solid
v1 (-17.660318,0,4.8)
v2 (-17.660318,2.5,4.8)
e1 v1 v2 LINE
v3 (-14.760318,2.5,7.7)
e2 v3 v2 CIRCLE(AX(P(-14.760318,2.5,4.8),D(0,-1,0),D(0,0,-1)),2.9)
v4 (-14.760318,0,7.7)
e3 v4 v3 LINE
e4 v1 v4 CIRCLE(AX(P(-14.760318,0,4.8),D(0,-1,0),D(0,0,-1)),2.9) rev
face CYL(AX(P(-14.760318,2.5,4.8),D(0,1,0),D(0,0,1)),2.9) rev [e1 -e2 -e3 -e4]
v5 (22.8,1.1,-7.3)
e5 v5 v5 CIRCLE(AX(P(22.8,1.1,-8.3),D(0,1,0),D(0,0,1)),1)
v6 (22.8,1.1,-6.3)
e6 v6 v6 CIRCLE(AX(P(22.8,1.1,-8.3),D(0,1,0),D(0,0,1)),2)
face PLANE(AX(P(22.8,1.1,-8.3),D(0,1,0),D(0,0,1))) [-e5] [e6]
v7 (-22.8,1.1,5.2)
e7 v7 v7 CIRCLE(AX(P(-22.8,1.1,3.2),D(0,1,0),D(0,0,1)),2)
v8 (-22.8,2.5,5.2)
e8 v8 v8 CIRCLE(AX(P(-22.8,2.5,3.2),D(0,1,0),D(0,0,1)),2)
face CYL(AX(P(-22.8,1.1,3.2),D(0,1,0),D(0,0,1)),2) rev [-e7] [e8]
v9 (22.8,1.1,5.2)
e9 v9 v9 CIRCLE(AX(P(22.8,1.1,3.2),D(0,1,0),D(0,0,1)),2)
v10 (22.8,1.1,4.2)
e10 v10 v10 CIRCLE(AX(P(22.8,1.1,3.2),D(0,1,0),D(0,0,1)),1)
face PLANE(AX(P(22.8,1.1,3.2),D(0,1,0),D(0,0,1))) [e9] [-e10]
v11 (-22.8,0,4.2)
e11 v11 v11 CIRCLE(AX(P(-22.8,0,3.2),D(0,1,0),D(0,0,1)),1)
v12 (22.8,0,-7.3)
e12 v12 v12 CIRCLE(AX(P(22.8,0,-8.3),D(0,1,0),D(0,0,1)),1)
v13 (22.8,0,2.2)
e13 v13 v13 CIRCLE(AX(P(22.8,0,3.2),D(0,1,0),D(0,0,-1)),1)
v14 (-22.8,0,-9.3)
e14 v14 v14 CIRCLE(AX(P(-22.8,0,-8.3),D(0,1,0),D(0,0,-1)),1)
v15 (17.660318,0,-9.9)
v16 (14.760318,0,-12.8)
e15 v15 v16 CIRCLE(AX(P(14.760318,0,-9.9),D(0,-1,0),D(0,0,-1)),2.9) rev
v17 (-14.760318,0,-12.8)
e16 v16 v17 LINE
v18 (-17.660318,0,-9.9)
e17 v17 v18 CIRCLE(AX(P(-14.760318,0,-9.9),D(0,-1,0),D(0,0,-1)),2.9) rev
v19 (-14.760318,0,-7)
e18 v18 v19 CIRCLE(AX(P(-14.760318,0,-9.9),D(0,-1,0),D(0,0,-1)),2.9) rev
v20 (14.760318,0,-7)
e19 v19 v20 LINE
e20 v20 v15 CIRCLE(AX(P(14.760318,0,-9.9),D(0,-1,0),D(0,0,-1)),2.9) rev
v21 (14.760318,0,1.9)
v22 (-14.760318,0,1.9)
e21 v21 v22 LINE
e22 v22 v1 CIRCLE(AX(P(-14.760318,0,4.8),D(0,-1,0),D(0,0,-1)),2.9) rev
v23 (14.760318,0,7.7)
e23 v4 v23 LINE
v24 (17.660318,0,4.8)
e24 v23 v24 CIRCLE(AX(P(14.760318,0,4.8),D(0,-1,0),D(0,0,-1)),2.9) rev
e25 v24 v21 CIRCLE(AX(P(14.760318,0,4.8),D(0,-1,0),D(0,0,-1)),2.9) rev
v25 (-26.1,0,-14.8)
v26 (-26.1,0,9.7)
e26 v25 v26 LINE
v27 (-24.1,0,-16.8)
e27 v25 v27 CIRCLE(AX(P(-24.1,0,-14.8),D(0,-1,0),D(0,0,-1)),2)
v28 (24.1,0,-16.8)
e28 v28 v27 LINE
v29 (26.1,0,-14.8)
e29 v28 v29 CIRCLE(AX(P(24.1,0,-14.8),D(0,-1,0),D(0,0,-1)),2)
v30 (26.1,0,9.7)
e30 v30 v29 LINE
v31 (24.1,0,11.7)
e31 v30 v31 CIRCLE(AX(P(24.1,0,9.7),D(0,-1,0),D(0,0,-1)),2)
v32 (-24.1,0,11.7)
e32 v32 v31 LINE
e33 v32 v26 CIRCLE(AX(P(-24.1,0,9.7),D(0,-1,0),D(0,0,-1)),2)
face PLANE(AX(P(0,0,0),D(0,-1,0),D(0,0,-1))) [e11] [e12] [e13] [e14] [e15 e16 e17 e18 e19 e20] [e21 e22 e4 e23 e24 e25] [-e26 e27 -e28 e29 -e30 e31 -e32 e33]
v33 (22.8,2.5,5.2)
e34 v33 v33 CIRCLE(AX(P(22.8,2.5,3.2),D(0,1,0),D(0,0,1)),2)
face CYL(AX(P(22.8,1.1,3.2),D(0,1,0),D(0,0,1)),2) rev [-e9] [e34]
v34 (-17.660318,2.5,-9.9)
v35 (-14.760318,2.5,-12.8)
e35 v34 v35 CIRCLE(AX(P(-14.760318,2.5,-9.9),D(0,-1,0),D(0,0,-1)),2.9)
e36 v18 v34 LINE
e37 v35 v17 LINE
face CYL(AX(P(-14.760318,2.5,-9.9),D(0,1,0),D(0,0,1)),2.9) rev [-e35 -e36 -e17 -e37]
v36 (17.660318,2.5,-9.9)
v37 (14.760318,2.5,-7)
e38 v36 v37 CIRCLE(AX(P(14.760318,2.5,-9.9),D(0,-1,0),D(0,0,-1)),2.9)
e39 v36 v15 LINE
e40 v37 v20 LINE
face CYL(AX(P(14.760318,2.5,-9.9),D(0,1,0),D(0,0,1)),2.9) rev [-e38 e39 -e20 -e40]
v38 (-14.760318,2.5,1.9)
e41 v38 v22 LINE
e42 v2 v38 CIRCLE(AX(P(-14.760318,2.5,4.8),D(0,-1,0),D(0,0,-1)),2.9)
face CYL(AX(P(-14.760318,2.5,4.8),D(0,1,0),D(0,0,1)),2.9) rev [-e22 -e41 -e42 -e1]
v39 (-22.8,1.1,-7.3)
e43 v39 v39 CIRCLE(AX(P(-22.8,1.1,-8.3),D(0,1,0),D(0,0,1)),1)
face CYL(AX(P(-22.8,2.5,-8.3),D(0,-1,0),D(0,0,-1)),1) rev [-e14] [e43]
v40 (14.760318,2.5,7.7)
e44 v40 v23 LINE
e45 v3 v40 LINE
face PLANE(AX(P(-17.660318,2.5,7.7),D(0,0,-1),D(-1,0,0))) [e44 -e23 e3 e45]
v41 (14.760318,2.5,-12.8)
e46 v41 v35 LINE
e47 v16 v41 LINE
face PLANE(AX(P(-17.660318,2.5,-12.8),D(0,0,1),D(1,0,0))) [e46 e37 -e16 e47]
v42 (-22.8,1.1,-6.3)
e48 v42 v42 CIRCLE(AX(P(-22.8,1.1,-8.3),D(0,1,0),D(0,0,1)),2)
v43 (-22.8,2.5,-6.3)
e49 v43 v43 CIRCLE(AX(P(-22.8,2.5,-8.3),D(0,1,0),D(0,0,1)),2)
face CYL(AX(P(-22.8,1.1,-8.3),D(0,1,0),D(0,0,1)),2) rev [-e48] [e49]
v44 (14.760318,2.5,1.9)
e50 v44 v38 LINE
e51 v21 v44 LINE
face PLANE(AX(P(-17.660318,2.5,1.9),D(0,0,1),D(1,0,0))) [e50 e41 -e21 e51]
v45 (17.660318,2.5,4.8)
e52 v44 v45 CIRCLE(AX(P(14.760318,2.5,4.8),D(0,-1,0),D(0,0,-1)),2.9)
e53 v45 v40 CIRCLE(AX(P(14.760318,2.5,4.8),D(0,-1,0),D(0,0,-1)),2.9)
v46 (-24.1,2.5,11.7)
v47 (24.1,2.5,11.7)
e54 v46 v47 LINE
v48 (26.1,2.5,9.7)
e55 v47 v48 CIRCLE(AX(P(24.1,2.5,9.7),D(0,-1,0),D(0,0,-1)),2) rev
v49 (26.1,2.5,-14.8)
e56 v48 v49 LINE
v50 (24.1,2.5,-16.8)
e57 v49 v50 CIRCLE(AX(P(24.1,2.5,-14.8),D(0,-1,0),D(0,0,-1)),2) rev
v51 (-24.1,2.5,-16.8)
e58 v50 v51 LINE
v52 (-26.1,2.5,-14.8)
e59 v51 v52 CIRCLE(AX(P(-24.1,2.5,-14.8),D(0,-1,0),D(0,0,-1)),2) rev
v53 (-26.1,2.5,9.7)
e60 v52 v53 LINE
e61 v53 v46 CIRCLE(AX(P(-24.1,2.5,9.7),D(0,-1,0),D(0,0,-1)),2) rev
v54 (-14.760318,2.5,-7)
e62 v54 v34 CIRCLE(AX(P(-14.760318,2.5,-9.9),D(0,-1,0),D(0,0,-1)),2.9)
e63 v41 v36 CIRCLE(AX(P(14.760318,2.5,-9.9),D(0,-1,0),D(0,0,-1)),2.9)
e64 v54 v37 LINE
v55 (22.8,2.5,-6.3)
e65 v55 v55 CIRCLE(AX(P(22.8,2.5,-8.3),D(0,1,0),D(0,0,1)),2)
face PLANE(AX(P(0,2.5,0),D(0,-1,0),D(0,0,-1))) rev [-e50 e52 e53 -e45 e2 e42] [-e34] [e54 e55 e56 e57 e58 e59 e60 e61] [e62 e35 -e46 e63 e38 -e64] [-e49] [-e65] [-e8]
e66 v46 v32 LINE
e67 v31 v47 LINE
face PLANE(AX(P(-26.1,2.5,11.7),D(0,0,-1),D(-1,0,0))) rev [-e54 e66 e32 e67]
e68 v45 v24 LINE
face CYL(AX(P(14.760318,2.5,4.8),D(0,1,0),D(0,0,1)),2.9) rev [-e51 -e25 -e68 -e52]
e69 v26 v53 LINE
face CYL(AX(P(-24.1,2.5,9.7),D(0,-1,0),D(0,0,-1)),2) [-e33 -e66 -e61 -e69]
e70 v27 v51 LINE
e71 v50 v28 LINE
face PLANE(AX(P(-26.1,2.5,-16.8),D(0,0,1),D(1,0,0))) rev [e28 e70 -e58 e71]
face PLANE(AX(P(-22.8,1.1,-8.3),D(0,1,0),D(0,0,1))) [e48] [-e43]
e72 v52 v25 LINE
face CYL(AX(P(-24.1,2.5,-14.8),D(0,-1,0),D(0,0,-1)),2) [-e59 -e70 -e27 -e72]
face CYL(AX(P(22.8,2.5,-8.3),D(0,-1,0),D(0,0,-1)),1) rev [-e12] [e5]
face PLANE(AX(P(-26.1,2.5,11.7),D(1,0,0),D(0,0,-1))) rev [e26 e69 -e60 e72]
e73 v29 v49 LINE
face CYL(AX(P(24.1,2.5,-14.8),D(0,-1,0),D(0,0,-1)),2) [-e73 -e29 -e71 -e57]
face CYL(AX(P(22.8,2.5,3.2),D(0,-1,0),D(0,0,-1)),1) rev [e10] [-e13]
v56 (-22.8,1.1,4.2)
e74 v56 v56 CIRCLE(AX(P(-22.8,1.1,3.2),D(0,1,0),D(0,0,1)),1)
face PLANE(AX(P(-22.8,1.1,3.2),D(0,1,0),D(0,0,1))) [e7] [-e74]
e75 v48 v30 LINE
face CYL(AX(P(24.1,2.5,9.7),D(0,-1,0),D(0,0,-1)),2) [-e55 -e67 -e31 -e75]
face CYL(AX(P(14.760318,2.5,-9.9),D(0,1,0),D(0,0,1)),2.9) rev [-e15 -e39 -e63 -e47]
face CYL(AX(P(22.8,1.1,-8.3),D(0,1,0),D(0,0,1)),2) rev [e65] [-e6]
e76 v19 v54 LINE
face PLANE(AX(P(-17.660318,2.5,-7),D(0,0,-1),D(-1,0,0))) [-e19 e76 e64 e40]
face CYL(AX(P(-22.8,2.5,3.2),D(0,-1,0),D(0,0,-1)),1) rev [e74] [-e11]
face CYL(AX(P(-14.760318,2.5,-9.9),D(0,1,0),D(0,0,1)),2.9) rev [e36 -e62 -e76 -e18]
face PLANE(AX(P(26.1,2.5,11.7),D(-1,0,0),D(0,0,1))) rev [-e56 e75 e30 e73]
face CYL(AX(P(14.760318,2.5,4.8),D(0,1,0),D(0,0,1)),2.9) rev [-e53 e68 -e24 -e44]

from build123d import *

# Parameters (mm, degrees)
SKETCH1_W           = 52.2
SKETCH1_H           = 28.5
SKETCH1_R           = 1
SKETCH1_W_2         = 35.320636832
SKETCH1_H_2         = 5.8
BOSS_EXTRUDE1_DEPTH = 2.5
FILLET1_R           = 2
FILLET2_R           = 2.9
SKETCH4_R           = 2
CUT_EXTRUDE1_DEPTH  = 1.4


with BuildPart() as part:
    # Sketch1 → Boss-Extrude1 (new body)
    with BuildSketch(Plane(origin=(0, 0, 0), x_dir=(1, 0, 0), z_dir=(0, 1, 0))):
        with Locations((0, 2.55)):
            Rectangle(SKETCH1_W, SKETCH1_H)
        with Locations(Location((-22.8, -3.2, 0), (0, 0, 270))):
            Circle(SKETCH1_R, mode=Mode.SUBTRACT)
        with Locations(Location((22.8, -3.2, 0), (0, 0, 90))):
            Circle(SKETCH1_R, mode=Mode.SUBTRACT)
        with Locations(Location((22.8, 8.3, 0), (0, 0, 270))):
            Circle(SKETCH1_R, mode=Mode.SUBTRACT)
        with Locations(Location((-22.8, 8.3, 0), (0, 0, 90))):
            Circle(SKETCH1_R, mode=Mode.SUBTRACT)
        with Locations((0, -4.8)):
            Rectangle(SKETCH1_W_2, SKETCH1_H_2, mode=Mode.SUBTRACT)
        with Locations((0, 9.9)):
            Rectangle(SKETCH1_W_2, SKETCH1_H_2, mode=Mode.SUBTRACT)
    extrude(amount=BOSS_EXTRUDE1_DEPTH)

    # Fillet1
    fillet1_edges = [part.edges().sort_by_distance(p)[0] for p in [
        (26.1, 1.25, 11.7),
        (-26.1, 1.25, 11.7),
        (-26.1, 1.25, -16.8),
        (26.1, 1.25, -16.8),
    ]]
    fillet(fillet1_edges, radius=FILLET1_R)

    # Fillet2
    fillet2_edges = [part.edges().sort_by_distance(p)[0] for p in [
        (17.660318416, 1.25, -7),
        (17.660318416, 1.25, -12.8),
        (17.660318416, 1.25, 7.7),
        (17.660318416, 1.25, 1.9),
        (-17.660318416, 1.25, 7.7),
        (-17.660318416, 1.25, 1.9),
        (-17.660318416, 1.25, -7),
        (-17.660318416, 1.25, -12.8),
    ]]
    fillet(fillet2_edges, radius=FILLET2_R - 0.0001)  # a hair under: the kernel refuses the full size

    # Sketch4 → Cut-Extrude1 (cut)
    with BuildSketch(Plane(origin=(0, 2.5, 0), x_dir=(1, 0, 0), z_dir=(0, 1, 0))):
        with Locations(Location((-22.8, 8.3, 0), (0, 0, 270))):
            Circle(SKETCH4_R)
        with Locations(Location((-22.8, -3.2, 0), (0, 0, 270))):
            Circle(SKETCH4_R)
        with Locations(Location((22.8, -3.2, 0), (0, 0, 270))):
            Circle(SKETCH4_R)
        with Locations(Location((22.8, 8.3, 0), (0, 0, 270))):
            Circle(SKETCH4_R)
    extrude(amount=-CUT_EXTRUDE1_DEPTH, mode=Mode.SUBTRACT)


solid = part.part
